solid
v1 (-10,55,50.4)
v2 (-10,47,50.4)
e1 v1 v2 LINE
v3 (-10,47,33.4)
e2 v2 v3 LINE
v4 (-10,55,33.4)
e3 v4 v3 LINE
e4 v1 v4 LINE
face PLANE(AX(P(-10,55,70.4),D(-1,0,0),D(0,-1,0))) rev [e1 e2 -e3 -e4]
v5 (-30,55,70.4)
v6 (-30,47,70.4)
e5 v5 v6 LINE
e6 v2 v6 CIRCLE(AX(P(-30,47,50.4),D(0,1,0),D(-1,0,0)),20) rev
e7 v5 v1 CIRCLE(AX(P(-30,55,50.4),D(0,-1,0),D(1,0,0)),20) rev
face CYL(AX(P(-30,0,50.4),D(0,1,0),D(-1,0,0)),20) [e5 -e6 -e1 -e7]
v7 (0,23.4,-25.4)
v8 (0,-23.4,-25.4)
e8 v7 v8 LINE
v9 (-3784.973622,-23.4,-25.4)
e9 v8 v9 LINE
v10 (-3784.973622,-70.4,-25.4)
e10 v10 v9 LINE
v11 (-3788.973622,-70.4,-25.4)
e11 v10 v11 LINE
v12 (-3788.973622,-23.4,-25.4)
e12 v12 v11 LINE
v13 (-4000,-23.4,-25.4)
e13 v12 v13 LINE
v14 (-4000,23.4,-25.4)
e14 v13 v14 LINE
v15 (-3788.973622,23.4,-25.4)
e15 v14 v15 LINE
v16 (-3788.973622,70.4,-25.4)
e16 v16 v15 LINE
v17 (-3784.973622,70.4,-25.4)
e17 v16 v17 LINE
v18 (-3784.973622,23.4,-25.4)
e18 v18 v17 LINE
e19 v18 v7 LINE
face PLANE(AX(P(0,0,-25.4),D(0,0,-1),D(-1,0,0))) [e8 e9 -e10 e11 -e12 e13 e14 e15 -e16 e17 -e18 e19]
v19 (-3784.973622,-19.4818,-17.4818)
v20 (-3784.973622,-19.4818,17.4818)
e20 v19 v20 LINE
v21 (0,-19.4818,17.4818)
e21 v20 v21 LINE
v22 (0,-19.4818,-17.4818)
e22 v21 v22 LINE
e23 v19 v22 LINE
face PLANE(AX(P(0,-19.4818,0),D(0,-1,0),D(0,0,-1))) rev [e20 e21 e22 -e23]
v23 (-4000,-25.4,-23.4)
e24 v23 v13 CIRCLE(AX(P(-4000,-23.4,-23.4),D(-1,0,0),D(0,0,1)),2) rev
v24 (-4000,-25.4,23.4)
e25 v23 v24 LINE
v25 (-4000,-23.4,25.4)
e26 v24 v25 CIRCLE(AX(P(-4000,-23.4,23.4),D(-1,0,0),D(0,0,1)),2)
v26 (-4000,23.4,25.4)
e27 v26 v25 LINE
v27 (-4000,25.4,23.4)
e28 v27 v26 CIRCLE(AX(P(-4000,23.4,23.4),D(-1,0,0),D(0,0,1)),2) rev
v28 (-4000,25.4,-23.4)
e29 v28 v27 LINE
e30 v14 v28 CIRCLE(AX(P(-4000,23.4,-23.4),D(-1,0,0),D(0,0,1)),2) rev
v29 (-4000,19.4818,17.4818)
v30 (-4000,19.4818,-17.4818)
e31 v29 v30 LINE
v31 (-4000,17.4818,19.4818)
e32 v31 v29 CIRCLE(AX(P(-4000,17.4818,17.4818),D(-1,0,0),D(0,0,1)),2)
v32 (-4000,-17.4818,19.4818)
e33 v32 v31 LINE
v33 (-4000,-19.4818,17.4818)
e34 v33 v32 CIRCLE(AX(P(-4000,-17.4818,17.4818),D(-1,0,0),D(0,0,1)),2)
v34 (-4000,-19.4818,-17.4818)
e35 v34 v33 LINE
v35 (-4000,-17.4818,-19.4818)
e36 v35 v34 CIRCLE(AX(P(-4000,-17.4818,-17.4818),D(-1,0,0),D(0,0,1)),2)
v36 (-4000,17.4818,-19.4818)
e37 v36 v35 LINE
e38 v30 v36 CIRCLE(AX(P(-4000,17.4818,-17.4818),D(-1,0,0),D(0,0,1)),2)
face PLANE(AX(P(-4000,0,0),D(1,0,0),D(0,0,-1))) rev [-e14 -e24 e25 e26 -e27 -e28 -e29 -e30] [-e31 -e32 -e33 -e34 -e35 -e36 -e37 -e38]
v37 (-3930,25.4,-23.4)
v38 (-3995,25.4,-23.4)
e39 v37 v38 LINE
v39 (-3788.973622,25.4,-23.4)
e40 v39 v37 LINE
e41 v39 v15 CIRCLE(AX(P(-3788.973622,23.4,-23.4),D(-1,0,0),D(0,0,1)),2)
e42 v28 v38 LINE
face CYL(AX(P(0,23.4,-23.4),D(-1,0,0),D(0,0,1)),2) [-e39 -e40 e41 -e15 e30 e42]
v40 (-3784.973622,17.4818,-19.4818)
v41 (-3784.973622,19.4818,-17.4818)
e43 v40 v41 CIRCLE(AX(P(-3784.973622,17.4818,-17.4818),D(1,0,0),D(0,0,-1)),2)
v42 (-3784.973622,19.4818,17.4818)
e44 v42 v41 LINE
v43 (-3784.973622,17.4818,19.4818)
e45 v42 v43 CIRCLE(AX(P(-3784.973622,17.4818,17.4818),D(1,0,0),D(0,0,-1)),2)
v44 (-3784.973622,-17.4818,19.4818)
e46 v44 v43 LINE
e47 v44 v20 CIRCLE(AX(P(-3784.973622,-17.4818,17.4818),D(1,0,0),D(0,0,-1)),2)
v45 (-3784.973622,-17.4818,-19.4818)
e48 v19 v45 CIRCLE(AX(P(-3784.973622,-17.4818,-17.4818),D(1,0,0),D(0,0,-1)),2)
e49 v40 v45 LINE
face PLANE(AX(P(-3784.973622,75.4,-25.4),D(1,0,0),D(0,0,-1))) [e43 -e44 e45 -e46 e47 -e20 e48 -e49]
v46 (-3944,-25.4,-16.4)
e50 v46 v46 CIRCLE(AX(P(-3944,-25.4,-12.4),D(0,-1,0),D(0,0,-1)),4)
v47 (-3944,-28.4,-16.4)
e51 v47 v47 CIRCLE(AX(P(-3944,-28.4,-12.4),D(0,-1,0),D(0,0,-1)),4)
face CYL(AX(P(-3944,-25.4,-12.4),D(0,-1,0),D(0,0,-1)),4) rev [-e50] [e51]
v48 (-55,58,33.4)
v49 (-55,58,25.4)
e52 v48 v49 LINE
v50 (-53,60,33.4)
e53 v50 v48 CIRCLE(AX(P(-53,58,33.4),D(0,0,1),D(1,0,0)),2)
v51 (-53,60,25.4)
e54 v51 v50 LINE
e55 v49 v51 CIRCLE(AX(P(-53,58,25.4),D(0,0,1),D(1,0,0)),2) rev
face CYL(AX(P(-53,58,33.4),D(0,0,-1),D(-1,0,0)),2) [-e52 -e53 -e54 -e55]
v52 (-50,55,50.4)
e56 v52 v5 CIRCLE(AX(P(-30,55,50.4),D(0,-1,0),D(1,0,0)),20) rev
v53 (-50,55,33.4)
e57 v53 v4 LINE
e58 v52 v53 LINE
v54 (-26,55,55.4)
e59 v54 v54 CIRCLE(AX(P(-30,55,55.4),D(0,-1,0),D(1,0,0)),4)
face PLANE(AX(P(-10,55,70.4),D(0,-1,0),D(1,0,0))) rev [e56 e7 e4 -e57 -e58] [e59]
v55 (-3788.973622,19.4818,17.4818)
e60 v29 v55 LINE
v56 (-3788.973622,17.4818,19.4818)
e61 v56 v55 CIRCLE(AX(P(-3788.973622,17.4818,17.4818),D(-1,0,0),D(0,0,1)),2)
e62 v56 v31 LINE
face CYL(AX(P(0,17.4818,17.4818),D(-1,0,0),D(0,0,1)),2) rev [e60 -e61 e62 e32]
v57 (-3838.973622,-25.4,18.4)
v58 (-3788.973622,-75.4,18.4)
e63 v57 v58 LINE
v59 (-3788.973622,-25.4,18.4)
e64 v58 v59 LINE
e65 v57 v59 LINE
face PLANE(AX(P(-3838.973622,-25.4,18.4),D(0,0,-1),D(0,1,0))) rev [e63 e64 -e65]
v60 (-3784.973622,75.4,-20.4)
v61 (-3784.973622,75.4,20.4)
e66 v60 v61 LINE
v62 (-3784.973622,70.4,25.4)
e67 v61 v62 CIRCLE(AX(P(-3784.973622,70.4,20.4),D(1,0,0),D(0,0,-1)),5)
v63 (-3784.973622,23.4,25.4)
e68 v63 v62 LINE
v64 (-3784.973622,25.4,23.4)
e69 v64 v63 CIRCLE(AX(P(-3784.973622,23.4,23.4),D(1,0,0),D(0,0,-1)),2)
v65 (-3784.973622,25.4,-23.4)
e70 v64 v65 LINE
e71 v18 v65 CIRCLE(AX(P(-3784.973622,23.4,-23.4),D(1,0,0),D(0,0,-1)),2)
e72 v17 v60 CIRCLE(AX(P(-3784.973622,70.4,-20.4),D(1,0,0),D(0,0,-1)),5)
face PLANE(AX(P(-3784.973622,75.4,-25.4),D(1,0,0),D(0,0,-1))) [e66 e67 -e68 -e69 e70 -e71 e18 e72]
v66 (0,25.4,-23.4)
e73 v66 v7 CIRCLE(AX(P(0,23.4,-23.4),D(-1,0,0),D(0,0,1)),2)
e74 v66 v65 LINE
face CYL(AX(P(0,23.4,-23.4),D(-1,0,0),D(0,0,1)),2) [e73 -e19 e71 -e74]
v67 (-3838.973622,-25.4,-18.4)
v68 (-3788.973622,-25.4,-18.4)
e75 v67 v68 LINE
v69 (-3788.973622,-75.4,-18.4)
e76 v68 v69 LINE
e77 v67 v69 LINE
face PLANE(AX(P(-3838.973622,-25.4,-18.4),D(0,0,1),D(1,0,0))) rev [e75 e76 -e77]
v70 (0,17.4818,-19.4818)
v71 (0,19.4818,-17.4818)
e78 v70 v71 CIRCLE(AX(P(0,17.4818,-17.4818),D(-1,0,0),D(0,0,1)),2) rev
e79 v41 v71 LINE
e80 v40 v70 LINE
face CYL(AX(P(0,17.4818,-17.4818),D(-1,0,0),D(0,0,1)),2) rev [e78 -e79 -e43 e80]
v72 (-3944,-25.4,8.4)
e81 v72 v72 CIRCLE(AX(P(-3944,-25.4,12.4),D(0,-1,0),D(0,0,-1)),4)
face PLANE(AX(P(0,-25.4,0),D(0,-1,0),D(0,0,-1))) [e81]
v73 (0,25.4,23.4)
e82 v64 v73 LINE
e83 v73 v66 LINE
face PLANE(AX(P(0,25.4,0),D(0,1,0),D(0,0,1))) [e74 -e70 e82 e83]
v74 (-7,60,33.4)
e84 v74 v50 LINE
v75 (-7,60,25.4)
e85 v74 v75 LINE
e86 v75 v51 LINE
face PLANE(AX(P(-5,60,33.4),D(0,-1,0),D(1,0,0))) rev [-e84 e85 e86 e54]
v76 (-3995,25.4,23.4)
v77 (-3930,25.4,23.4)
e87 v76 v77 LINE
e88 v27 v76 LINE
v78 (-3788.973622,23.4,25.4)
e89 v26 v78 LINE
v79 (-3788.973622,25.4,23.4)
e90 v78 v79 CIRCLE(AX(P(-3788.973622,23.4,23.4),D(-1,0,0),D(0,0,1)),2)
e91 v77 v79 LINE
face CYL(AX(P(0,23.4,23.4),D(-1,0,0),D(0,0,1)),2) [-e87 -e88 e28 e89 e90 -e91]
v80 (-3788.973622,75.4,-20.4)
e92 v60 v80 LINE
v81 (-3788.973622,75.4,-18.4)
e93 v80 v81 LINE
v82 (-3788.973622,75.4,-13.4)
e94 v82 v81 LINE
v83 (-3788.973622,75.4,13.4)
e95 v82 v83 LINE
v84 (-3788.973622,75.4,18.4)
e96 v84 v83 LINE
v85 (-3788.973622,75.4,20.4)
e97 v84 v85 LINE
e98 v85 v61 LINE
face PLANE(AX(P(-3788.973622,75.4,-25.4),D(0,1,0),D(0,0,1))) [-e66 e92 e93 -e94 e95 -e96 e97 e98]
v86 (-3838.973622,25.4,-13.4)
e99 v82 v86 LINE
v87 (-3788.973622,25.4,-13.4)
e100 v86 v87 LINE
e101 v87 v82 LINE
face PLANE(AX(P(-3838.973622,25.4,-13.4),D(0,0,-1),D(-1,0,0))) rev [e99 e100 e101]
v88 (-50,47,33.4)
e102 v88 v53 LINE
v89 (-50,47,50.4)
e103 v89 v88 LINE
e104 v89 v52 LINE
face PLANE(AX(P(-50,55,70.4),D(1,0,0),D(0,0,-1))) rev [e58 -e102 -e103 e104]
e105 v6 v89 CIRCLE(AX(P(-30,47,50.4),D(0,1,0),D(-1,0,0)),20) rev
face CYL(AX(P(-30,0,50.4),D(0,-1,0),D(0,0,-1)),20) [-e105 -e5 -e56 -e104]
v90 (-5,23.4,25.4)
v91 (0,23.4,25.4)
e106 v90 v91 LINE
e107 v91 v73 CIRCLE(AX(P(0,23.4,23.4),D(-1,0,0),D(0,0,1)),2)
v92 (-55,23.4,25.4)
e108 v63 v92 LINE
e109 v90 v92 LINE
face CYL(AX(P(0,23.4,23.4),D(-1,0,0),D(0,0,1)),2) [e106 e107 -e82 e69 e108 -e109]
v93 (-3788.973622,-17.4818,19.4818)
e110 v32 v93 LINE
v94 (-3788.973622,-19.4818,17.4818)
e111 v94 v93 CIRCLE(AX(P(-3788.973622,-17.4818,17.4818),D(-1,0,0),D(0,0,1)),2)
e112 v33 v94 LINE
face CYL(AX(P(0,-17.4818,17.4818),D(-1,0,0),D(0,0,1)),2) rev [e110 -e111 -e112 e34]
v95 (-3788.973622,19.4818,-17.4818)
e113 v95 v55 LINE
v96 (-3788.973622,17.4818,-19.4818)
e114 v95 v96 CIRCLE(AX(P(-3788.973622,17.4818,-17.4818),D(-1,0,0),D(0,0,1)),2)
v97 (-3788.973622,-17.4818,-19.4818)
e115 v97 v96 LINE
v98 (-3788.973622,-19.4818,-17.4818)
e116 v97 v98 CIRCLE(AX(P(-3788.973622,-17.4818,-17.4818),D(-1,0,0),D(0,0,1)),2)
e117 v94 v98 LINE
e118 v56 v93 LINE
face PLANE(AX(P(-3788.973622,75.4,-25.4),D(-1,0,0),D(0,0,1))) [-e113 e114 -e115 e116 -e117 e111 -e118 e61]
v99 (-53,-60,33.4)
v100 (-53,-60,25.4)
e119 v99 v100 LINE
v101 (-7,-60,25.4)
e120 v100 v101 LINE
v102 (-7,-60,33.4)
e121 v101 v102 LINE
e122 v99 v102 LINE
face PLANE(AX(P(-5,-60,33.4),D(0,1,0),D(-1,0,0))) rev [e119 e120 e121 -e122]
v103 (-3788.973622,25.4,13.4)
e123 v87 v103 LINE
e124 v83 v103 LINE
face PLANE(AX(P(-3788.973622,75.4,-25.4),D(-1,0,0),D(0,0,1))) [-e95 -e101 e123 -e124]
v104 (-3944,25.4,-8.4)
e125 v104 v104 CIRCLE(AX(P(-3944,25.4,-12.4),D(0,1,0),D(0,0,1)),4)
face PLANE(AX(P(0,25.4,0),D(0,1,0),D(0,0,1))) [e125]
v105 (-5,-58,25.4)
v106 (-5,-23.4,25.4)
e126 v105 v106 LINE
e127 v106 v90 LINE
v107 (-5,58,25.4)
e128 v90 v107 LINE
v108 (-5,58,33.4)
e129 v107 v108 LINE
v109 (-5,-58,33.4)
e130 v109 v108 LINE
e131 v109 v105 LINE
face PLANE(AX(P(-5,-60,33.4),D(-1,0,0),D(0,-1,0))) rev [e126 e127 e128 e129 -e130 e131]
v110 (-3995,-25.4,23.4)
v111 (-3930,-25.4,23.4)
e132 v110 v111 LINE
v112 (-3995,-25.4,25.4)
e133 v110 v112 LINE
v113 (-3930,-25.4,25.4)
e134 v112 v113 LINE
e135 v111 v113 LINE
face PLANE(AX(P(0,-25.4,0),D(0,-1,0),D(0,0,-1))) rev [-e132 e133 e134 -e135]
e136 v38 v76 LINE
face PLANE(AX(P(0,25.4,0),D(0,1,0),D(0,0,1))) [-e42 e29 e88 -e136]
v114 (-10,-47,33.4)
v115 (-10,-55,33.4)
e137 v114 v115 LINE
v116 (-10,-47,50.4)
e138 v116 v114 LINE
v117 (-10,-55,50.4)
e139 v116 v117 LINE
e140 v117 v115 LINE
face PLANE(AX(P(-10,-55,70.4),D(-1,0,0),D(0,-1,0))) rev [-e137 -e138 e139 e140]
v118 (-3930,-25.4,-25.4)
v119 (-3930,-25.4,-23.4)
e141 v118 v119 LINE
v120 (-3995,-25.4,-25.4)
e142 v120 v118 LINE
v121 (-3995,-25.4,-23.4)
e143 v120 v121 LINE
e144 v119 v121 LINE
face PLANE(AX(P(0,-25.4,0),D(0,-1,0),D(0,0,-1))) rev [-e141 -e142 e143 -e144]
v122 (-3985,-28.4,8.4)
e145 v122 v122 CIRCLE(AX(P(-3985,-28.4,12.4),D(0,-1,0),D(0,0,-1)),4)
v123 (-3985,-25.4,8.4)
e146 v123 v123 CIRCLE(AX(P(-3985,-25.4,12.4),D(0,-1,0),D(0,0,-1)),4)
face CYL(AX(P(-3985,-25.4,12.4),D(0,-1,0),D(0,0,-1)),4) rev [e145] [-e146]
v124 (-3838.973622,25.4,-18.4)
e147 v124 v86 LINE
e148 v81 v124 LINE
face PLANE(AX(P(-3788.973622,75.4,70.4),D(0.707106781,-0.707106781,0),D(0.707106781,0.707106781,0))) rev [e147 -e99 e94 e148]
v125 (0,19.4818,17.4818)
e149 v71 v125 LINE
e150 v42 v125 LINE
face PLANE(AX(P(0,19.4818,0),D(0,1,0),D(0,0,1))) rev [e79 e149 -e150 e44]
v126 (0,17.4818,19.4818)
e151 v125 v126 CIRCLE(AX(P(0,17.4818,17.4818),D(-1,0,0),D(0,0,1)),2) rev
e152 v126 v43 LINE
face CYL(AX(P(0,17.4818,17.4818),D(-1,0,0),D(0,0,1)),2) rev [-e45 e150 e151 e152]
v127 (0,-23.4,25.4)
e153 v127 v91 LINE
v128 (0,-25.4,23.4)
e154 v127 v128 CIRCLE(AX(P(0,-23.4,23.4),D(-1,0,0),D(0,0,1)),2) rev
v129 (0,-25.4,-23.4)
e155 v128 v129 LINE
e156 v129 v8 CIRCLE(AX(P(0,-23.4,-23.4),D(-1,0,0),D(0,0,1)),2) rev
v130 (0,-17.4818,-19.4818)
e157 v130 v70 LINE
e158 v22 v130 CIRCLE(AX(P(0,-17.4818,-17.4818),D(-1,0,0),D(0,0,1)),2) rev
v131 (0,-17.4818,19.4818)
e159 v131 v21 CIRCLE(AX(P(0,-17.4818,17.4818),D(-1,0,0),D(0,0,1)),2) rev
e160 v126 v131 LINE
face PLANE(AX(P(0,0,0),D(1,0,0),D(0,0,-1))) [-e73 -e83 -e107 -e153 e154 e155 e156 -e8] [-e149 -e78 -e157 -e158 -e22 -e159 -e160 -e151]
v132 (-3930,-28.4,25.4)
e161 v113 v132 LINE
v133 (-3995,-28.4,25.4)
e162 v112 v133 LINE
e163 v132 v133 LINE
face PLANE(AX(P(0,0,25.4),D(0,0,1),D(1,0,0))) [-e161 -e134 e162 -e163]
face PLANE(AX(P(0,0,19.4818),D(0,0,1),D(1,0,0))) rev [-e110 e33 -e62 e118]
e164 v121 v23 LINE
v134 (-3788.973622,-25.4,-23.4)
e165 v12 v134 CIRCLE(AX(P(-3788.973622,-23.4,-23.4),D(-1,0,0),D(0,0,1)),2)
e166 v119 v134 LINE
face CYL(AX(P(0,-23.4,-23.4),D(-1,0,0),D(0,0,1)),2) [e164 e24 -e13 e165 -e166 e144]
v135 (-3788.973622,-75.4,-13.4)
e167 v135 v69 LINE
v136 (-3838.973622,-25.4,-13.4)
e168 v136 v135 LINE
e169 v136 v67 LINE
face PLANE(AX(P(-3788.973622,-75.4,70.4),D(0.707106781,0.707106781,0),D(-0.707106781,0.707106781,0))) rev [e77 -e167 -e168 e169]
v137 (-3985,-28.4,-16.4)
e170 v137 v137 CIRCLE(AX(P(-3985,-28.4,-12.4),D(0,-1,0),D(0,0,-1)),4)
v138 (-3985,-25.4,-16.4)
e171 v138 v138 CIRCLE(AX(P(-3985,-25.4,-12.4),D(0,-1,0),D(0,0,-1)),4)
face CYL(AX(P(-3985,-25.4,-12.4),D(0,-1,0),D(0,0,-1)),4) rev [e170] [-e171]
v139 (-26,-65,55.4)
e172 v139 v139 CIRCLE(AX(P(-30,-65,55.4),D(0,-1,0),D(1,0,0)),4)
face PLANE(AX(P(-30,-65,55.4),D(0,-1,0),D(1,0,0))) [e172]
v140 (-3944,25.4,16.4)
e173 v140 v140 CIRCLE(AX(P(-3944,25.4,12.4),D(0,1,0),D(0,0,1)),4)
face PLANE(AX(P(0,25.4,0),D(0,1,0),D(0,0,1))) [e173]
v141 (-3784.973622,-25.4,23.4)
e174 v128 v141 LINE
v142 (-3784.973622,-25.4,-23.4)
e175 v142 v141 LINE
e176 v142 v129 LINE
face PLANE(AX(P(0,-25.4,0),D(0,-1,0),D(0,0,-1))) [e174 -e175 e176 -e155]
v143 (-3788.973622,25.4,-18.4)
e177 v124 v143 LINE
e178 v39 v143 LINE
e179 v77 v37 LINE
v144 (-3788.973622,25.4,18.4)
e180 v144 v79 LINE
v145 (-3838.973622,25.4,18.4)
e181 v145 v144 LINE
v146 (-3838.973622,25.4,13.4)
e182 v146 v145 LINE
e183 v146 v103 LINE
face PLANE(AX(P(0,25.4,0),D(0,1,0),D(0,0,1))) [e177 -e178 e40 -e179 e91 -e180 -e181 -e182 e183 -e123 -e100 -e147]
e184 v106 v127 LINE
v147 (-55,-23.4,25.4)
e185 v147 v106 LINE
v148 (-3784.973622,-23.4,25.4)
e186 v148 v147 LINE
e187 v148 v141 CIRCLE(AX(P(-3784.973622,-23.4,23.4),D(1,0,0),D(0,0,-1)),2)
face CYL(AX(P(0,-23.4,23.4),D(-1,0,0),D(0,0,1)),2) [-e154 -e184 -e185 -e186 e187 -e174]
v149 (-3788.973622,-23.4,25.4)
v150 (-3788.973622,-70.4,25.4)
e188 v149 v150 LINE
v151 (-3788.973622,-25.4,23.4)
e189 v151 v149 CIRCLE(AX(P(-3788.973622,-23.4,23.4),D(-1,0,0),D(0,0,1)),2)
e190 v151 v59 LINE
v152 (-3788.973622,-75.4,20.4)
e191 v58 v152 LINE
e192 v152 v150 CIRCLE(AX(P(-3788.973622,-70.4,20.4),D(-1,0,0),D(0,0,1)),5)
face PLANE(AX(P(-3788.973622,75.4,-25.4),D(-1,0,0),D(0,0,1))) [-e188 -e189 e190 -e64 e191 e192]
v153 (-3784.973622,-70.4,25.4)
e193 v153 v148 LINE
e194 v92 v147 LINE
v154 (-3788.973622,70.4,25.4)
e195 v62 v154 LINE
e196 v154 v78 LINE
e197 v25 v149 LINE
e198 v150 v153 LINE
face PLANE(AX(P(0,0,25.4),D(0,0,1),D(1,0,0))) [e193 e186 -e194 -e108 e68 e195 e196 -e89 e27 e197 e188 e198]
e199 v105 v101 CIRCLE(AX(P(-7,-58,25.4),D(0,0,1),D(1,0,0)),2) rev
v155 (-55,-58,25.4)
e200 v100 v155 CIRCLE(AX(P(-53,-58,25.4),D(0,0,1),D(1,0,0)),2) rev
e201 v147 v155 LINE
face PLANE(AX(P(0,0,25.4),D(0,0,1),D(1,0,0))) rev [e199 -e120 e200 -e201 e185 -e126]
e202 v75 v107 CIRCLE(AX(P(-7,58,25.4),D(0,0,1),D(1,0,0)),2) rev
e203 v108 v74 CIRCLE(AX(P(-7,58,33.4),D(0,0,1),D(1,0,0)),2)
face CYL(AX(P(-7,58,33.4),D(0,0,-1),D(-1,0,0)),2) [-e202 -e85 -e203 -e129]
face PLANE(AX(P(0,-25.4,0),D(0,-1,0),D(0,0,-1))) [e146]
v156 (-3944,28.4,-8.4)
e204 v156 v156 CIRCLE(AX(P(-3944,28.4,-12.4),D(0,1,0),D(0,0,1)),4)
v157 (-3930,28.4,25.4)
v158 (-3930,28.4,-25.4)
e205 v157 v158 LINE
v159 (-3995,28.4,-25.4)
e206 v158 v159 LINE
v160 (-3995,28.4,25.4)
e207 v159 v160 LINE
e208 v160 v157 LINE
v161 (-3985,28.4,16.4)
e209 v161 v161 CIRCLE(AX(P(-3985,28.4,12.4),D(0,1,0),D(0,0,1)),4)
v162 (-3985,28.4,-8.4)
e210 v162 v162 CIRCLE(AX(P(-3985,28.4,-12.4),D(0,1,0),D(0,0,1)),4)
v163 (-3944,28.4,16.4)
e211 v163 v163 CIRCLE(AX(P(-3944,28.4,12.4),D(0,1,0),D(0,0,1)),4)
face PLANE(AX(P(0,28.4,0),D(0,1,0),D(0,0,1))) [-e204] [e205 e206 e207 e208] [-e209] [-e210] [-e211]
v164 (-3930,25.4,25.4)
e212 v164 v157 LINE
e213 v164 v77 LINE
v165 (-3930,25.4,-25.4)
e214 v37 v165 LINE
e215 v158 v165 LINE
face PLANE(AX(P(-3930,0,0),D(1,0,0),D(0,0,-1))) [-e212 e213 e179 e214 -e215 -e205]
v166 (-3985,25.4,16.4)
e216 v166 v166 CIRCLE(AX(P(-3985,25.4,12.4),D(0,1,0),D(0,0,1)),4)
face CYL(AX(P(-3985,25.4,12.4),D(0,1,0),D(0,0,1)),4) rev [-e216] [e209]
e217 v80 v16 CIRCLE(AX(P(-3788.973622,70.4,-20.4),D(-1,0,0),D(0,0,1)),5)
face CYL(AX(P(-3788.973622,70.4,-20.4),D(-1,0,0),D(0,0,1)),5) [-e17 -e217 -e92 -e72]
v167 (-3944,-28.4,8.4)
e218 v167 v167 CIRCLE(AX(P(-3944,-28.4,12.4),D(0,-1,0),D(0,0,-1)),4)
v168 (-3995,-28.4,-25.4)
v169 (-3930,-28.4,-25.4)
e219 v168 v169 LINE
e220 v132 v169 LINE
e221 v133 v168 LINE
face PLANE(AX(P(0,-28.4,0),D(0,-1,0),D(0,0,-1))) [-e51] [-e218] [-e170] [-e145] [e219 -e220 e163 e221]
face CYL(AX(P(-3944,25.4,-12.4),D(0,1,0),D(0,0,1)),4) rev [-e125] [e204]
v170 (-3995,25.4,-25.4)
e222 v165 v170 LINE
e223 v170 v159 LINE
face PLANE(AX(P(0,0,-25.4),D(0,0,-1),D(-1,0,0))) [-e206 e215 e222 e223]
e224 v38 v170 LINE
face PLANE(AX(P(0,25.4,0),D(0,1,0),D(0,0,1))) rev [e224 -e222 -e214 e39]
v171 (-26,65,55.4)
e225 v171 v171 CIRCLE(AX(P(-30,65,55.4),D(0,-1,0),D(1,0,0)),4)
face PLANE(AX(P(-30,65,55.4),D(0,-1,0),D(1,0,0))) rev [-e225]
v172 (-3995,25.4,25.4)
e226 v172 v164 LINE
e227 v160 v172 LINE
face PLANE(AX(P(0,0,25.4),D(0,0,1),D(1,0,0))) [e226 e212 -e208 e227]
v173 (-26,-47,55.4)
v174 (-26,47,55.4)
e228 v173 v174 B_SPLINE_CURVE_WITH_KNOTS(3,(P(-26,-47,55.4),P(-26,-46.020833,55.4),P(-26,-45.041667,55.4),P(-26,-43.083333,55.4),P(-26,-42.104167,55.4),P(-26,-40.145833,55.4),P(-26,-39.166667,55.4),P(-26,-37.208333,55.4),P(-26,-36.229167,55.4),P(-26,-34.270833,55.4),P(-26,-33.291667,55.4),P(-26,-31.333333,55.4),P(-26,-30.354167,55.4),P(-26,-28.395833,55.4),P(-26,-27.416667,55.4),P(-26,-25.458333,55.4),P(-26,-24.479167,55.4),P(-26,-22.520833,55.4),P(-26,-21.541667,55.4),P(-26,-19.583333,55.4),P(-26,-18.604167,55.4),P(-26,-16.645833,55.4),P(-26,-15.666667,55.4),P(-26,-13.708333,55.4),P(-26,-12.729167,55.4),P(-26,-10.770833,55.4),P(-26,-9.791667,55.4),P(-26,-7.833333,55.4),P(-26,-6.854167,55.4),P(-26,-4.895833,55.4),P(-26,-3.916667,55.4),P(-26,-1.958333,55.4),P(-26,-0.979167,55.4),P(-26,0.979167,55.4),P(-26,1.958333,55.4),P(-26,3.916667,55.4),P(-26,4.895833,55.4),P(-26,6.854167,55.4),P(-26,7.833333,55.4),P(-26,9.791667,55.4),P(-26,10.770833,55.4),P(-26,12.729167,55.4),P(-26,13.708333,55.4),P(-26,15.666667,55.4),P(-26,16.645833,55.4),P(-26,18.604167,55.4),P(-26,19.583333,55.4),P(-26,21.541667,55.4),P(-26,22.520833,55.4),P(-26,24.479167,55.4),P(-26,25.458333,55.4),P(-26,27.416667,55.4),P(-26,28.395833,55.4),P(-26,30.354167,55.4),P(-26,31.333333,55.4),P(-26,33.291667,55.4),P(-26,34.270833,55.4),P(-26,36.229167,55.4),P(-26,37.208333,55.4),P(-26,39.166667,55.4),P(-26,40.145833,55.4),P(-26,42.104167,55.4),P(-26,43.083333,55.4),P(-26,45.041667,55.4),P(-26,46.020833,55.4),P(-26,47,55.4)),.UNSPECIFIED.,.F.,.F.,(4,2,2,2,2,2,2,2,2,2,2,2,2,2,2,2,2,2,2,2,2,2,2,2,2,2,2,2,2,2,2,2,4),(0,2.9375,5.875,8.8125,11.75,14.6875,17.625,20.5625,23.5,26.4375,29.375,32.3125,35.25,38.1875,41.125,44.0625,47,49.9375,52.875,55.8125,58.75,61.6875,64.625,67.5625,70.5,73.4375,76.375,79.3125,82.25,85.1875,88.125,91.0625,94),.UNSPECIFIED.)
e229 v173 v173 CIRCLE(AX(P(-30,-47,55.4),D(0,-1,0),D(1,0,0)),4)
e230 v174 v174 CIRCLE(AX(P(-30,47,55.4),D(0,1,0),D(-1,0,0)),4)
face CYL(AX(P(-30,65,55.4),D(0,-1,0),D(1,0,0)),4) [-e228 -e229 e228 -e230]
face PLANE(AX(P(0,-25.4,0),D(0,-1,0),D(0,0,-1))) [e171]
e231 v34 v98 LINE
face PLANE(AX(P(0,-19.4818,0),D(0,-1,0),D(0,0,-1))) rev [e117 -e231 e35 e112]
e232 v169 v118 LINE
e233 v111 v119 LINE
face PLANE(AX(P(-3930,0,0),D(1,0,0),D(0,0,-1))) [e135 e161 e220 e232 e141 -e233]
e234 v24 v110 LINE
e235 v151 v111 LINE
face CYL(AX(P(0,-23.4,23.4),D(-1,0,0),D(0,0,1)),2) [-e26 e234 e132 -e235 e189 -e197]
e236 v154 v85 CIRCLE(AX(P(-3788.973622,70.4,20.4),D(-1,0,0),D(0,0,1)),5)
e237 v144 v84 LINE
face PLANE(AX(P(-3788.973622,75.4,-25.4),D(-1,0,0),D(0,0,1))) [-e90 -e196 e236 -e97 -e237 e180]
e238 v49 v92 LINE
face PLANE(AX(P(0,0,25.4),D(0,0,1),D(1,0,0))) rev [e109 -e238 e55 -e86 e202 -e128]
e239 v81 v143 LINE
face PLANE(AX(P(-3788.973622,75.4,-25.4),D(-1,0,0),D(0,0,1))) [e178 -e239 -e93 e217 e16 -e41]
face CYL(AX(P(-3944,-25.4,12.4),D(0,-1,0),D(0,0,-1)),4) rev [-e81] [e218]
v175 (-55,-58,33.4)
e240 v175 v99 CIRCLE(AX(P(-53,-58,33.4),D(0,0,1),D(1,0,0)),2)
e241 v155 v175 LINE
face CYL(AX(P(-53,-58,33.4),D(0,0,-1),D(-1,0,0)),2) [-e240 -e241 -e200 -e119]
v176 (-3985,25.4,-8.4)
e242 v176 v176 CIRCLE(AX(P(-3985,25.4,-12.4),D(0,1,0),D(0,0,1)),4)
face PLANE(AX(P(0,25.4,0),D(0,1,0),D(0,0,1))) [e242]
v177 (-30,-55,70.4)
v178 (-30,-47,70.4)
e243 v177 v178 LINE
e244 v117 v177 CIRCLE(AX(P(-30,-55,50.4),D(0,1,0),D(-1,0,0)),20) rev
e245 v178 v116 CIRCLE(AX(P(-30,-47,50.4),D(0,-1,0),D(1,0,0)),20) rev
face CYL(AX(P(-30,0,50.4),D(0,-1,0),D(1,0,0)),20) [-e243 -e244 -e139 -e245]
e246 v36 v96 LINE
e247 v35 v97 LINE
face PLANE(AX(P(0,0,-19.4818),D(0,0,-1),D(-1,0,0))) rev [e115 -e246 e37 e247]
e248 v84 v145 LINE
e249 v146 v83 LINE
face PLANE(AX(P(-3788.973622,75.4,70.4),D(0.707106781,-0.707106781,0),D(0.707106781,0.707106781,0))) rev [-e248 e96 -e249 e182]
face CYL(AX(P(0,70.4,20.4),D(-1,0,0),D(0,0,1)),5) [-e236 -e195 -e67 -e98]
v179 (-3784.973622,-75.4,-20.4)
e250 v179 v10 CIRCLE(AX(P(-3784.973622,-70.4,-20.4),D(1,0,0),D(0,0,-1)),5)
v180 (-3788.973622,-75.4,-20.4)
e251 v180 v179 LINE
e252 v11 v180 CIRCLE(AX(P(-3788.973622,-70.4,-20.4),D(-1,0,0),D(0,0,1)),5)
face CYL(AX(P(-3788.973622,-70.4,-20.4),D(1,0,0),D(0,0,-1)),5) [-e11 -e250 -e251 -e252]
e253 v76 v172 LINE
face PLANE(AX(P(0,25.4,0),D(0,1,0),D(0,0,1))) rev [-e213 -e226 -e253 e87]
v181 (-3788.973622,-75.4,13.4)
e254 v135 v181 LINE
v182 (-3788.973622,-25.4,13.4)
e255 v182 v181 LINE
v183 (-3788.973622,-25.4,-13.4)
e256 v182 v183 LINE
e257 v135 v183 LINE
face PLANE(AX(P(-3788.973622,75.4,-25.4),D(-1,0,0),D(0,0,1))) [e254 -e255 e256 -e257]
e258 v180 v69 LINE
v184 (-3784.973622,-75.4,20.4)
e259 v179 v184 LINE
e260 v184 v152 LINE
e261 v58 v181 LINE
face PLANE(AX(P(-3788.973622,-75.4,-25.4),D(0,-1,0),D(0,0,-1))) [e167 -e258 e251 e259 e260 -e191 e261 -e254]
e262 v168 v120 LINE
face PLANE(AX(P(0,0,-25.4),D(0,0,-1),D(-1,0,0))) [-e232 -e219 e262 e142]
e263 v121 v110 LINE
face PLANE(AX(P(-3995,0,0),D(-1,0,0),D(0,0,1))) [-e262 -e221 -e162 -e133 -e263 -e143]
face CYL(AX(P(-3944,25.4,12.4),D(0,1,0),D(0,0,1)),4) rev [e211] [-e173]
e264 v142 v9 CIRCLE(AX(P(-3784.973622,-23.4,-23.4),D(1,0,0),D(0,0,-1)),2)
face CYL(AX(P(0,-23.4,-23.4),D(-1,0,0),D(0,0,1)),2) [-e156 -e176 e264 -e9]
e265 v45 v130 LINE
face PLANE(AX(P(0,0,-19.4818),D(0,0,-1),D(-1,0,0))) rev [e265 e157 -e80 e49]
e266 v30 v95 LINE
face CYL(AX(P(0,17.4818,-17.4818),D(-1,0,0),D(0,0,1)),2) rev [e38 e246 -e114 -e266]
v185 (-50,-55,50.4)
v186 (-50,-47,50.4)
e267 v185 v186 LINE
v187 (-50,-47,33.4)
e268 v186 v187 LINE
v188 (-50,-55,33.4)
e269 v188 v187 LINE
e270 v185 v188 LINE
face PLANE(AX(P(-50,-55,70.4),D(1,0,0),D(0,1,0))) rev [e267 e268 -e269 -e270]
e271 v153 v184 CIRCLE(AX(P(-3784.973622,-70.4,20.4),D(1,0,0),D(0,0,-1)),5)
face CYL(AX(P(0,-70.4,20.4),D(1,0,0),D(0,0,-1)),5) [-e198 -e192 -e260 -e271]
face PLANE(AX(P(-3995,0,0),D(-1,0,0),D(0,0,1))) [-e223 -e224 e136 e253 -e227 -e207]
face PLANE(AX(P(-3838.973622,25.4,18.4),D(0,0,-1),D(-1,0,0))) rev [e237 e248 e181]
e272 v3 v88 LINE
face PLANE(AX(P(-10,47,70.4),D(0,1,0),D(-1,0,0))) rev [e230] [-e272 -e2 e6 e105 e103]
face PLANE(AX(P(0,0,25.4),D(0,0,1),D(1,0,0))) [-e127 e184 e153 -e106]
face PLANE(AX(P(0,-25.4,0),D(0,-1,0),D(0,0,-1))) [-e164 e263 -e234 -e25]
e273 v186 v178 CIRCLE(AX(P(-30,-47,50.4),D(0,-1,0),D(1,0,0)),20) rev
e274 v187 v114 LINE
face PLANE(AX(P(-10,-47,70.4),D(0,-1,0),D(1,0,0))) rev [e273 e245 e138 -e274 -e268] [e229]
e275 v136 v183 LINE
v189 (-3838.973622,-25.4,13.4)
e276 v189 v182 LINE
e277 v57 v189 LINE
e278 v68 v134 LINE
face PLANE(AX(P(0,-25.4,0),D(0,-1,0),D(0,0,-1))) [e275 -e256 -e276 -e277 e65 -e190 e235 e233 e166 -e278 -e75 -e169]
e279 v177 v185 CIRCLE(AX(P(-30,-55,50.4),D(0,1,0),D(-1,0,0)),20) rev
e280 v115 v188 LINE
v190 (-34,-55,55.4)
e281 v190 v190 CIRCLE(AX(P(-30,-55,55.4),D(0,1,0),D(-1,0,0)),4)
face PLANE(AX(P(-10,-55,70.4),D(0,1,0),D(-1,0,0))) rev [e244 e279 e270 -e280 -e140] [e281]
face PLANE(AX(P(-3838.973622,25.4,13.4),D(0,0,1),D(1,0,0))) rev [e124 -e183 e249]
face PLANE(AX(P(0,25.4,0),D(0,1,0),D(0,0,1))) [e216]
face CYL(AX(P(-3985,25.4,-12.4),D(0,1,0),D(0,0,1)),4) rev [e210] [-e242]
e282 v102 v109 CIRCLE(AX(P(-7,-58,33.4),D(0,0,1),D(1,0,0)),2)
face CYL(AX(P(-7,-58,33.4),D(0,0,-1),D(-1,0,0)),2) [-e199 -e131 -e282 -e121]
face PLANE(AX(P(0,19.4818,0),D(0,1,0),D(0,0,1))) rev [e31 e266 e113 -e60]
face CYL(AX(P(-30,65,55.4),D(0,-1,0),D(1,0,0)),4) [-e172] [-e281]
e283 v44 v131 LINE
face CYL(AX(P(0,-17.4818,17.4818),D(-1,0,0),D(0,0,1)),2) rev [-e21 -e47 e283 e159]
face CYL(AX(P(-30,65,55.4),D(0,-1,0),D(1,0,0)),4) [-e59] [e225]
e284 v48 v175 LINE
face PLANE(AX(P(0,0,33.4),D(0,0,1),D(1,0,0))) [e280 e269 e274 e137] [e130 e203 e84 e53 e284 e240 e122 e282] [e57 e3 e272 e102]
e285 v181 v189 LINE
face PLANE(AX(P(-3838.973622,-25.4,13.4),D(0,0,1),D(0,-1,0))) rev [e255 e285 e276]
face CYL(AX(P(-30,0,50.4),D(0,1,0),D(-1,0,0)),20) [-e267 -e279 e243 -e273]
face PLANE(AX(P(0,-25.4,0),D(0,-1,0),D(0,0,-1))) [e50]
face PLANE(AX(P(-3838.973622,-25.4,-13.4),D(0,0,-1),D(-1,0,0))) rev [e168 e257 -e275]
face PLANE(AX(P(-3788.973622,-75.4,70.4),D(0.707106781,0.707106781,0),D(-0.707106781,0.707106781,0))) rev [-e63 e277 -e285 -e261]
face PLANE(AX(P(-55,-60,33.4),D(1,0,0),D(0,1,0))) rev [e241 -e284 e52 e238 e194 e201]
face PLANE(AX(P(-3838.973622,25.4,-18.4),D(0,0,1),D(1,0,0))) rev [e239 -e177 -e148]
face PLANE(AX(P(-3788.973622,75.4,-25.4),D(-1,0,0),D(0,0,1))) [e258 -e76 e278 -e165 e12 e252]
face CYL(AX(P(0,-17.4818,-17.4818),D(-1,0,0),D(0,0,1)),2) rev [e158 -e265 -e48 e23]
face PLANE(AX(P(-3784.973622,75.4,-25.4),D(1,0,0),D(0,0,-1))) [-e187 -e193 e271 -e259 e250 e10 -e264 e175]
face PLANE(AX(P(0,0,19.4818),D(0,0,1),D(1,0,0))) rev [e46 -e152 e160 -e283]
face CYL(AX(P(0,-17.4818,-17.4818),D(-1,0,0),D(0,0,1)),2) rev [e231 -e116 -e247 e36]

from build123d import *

# Parameters (mm, degrees)
BOSS_EXTRUDE2_START         = -23.4
BOSS_EXTRUDE2_OUTLINE_W     = 4000
BOSS_EXTRUDE2_OUTLINE_H     = 5.9182
BOSS_EXTRUDE2_DEPTH         = 46.8
BOSS_EXTRUDE2_START_2       = -25.4
BOSS_EXTRUDE2_2_OUTLINE_W   = 50
BOSS_EXTRUDE2_2_OUTLINE_H   = 8
BOSS_EXTRUDE2_2_OUTLINE_W_2 = 4000
BOSS_EXTRUDE2_2_OUTLINE_H_2 = 38.9636
BOSS_EXTRUDE2_2_DEPTH       = 5.9182
BOSS_EXTRUDE2_START_3       = 19.4818
BOSS_EXTRUDE2_3_OUTLINE_W   = 50
BOSS_EXTRUDE2_3_OUTLINE_H   = 8
BOSS_EXTRUDE2_3_OUTLINE_W_2 = 4000
BOSS_EXTRUDE2_3_OUTLINE_H_2 = 38.9636
BOSS_EXTRUDE2_3_DEPTH       = 5.9182
BOSS_EXTRUDE2_START_4       = -60
BOSS_EXTRUDE2_4_OUTLINE_W   = 50
BOSS_EXTRUDE2_4_OUTLINE_H   = 8
BOSS_EXTRUDE2_4_DEPTH       = 120
BOSS_EXTRUDE2_START_5       = -28.4
BOSS_EXTRUDE2_5_OUTLINE_W   = 65
BOSS_EXTRUDE2_5_OUTLINE_H   = 50.8
BOSS_EXTRUDE2_5_OUTLINE_R   = 4
BOSS_EXTRUDE2_5_DEPTH       = 3
BOSS_EXTRUDE2_START_6       = 25.4
BOSS_EXTRUDE2_6_OUTLINE_W   = 65
BOSS_EXTRUDE2_6_OUTLINE_H   = 50.8
BOSS_EXTRUDE2_6_OUTLINE_R   = 4
BOSS_EXTRUDE2_6_DEPTH       = 3
BOSS_EXTRUDE2_START_7       = -4000
BOSS_EXTRUDE2_7_DEPTH       = 4000
SKETCH1_W                   = 40
SKETCH1_H                   = 8
BOSS_EXTRUDE1_DEPTH         = 45
FILLET1_R                   = 20
FILLET2_R                   = 2
BOSS_EXTRUDE3_DEPTH         = 10
BOSS_EXTRUDE3_DEPTH_BACK    = 120
SKETCH3_R                   = 4
SKETCH4_W                   = 4
SKETCH4_H                   = 150.8
BOSS_EXTRUDE4_DEPTH         = 50.8
SKETCH5_W                   = 5
SKETCH5_H                   = 50
BOSS_EXTRUDE5_DEPTH         = 50
CUT_EXTRUDE4_DEPTH          = 4002.695965463
FILLET3_R                   = 5
FILLET4_R                   = 5
FILLET5_R                   = 5
FILLET6_R                   = 5


with BuildPart() as part:
    # Boss-Extrude2: read off the stored shape, not the designer's step
    # Boss-Extrude2 outline → Boss-Extrude2 (new body)
    with BuildSketch(Plane(origin=(0, 0, 0), x_dir=(1, 0, 0), z_dir=(0, 1, 0)).offset(BOSS_EXTRUDE2_START)):
        Polygon((-55, -25.4), (-55, -33.4), (-5, -33.4), (-5, -25.4), (0, -25.4), (0, -19.4818), (-4000, -19.4818), (-4000, -25.4), align=None)
        with Locations((-2000, 22.4409)):
            Rectangle(BOSS_EXTRUDE2_OUTLINE_W, BOSS_EXTRUDE2_OUTLINE_H)
    extrude(amount=BOSS_EXTRUDE2_DEPTH)

    # Boss-Extrude2 2 outline → Boss-Extrude2 2 (add)
    with BuildSketch(Plane(origin=(0, 0, 0), x_dir=(1, 0, 0), z_dir=(0, 1, 0)).offset(BOSS_EXTRUDE2_START_2)):
        with Locations((-30, -29.4)):
            Rectangle(BOSS_EXTRUDE2_2_OUTLINE_W, BOSS_EXTRUDE2_2_OUTLINE_H)
        with Locations((-2000, 0)):
            Rectangle(BOSS_EXTRUDE2_2_OUTLINE_W_2, BOSS_EXTRUDE2_2_OUTLINE_H_2)
    extrude(amount=BOSS_EXTRUDE2_2_DEPTH)

    # Boss-Extrude2 3 outline → Boss-Extrude2 3 (add)
    with BuildSketch(Plane(origin=(0, 0, 0), x_dir=(1, 0, 0), z_dir=(0, 1, 0)).offset(BOSS_EXTRUDE2_START_3)):
        with Locations((-30, -29.4)):
            Rectangle(BOSS_EXTRUDE2_3_OUTLINE_W, BOSS_EXTRUDE2_3_OUTLINE_H)
        with Locations((-2000, 0)):
            Rectangle(BOSS_EXTRUDE2_3_OUTLINE_W_2, BOSS_EXTRUDE2_3_OUTLINE_H_2)
    extrude(amount=BOSS_EXTRUDE2_3_DEPTH)

    # Boss-Extrude2 4 outline → Boss-Extrude2 4 (add)
    with BuildSketch(Plane(origin=(0, 0, 0), x_dir=(1, 0, 0), z_dir=(0, 1, 0)).offset(BOSS_EXTRUDE2_START_4)):
        with Locations((-30, -29.4)):
            Rectangle(BOSS_EXTRUDE2_4_OUTLINE_W, BOSS_EXTRUDE2_4_OUTLINE_H)
    extrude(amount=BOSS_EXTRUDE2_4_DEPTH)

    # Boss-Extrude2 5 outline → Boss-Extrude2 5 (add)
    with BuildSketch(Plane(origin=(0, 0, 0), x_dir=(1, 0, 0), z_dir=(0, 1, 0)).offset(BOSS_EXTRUDE2_START_5)):
        with Locations((-3962.5, 0)):
            Rectangle(BOSS_EXTRUDE2_5_OUTLINE_W, BOSS_EXTRUDE2_5_OUTLINE_H)
        with Locations((-3944, 12.4)):
            Circle(BOSS_EXTRUDE2_5_OUTLINE_R, mode=Mode.SUBTRACT)
        with Locations((-3985, -12.4)):
            Circle(BOSS_EXTRUDE2_5_OUTLINE_R, mode=Mode.SUBTRACT)
        with Locations((-3944, -12.4)):
            Circle(BOSS_EXTRUDE2_5_OUTLINE_R, mode=Mode.SUBTRACT)
        with Locations((-3985, 12.4)):
            Circle(BOSS_EXTRUDE2_5_OUTLINE_R, mode=Mode.SUBTRACT)
    extrude(amount=BOSS_EXTRUDE2_5_DEPTH)

    # Boss-Extrude2 6 outline → Boss-Extrude2 6 (add)
    with BuildSketch(Plane(origin=(0, 0, 0), x_dir=(1, 0, 0), z_dir=(0, 1, 0)).offset(BOSS_EXTRUDE2_START_6)):
        with Locations((-3962.5, 0)):
            Rectangle(BOSS_EXTRUDE2_6_OUTLINE_W, BOSS_EXTRUDE2_6_OUTLINE_H)
        with Locations((-3944, 12.4)):
            Circle(BOSS_EXTRUDE2_6_OUTLINE_R, mode=Mode.SUBTRACT)
        with Locations((-3985, -12.4)):
            Circle(BOSS_EXTRUDE2_6_OUTLINE_R, mode=Mode.SUBTRACT)
        with Locations((-3944, -12.4)):
            Circle(BOSS_EXTRUDE2_6_OUTLINE_R, mode=Mode.SUBTRACT)
        with Locations((-3985, 12.4)):
            Circle(BOSS_EXTRUDE2_6_OUTLINE_R, mode=Mode.SUBTRACT)
    extrude(amount=BOSS_EXTRUDE2_6_DEPTH)

    # Boss-Extrude2 7 outline → Boss-Extrude2 7 (add)
    with BuildSketch(Plane.YZ.offset(BOSS_EXTRUDE2_START_7)):
        with BuildLine():
            Line((23.4, 19.4818), (25.4, 19.4818))
            Line((25.4, 19.4818), (25.4, 23.4))
            ThreePointArc((25.4, 23.4), (24.814213562, 24.814213562), (23.4, 25.4))
            Line((23.4, 25.4), (23.4, 19.4818))
        make_face()
        with BuildLine():
            ThreePointArc((23.4, -25.4), (24.814213562, -24.814213562), (25.4, -23.4))
            Line((25.4, -23.4), (25.4, -19.4818))
            Line((25.4, -19.4818), (23.4, -19.4818))
            Line((23.4, -19.4818), (23.4, -25.4))
        make_face()
        with BuildLine():
            Line((19.4818, 19.4818), (17.4818, 19.4818))
            ThreePointArc((17.4818, 19.4818), (18.896013562, 18.896013562), (19.4818, 17.4818))
            Line((19.4818, 17.4818), (19.4818, 19.4818))
        make_face()
        with BuildLine():
            ThreePointArc((-19.4818, 17.4818), (-18.896013562, 18.896013562), (-17.4818, 19.4818))
            Line((-17.4818, 19.4818), (-19.4818, 19.4818))
            Line((-19.4818, 19.4818), (-19.4818, 17.4818))
        make_face()
        with BuildLine():
            Line((19.4818, -19.4818), (19.4818, -17.4818))
            ThreePointArc((19.4818, -17.4818), (18.896013562, -18.896013562), (17.4818, -19.4818))
            Line((17.4818, -19.4818), (19.4818, -19.4818))
        make_face()
        with BuildLine():
            ThreePointArc((-17.4818, -19.4818), (-18.896013562, -18.896013562), (-19.4818, -17.4818))
            Line((-19.4818, -17.4818), (-19.4818, -19.4818))
            Line((-19.4818, -19.4818), (-17.4818, -19.4818))
        make_face()
        with BuildLine():
            Line((-25.4, 23.4), (-25.4, 19.4818))
            Line((-25.4, 19.4818), (-23.4, 19.4818))
            Line((-23.4, 19.4818), (-23.4, 25.4))
            ThreePointArc((-23.4, 25.4), (-24.814213562, 24.814213562), (-25.4, 23.4))
        make_face()
        with BuildLine():
            ThreePointArc((-25.4, -23.4), (-24.814213562, -24.814213562), (-23.4, -25.4))
            Line((-23.4, -25.4), (-23.4, -19.4818))
            Line((-23.4, -19.4818), (-25.4, -19.4818))
            Line((-25.4, -19.4818), (-25.4, -23.4))
        make_face()
    extrude(amount=BOSS_EXTRUDE2_7_DEPTH)

    # Sketch1 → Boss-Extrude1 (add)
    with BuildSketch(Plane.XY.offset(25.4)):
        with Locations((-30, 51)):
            Rectangle(SKETCH1_W, SKETCH1_H)
        with Locations((-30, -51)):
            Rectangle(SKETCH1_W, SKETCH1_H)
    extrude(amount=BOSS_EXTRUDE1_DEPTH)

    # Fillet1
    fillet1_edges = [part.edges().sort_by_distance(p)[0] for p in [
        (-10, 51, 70.4),
        (-50, 51, 70.4),
        (-50, -51, 70.4),
        (-10, -51, 70.4),
    ]]
    fillet(fillet1_edges, radius=FILLET1_R - 0.0001)  # a hair under: the kernel refuses the full size

    # Fillet2
    fillet2_edges = [part.edges().sort_by_distance(p)[0] for p in [
        (-5, -60, 29.4),
        (-5, 60, 29.4),
        (-55, 60, 29.4),
        (-55, -60, 29.4),
    ]]
    fillet(fillet2_edges, radius=FILLET2_R)

    # Sketch3 → Boss-Extrude3 (add, two sides: drawn at the far end of the back side and taken through both)
    with BuildSketch(Plane.XZ.offset(55).offset(-BOSS_EXTRUDE3_DEPTH_BACK)):
        with Locations((-30, 55.4)):
            Circle(SKETCH3_R)
    extrude(amount=BOSS_EXTRUDE3_DEPTH + BOSS_EXTRUDE3_DEPTH_BACK)

    # Sketch4 → Boss-Extrude4 (add)
    with BuildSketch(Plane.XY.offset(25.4)):
        with Locations((-3786.973621807, 0)):
            Rectangle(SKETCH4_W, SKETCH4_H)
    extrude(amount=-BOSS_EXTRUDE4_DEPTH)

    # Sketch5 → Boss-Extrude5 (add)
    with BuildSketch(Plane.ZY.offset(3788.973621807)):
        with Locations((15.9, 50.4)):
            Rectangle(SKETCH5_W, SKETCH5_H)
        with Locations((15.9, -50.4)):
            Rectangle(SKETCH5_W, SKETCH5_H)
        with Locations((-15.9, -50.4)):
            Rectangle(SKETCH5_W, SKETCH5_H)
        with Locations((-15.9, 50.4)):
            Rectangle(SKETCH5_W, SKETCH5_H)
    extrude(amount=BOSS_EXTRUDE5_DEPTH)

    # Sketch6 → Cut-Extrude4 (cut, through all)
    with BuildSketch(Plane(origin=(0, 0, -18.4), x_dir=(-1, 0, 0), z_dir=(0, 0, -1))):
        Polygon((3788.973621807, 75.4), (3838.973621807, 25.4), (3838.973621807, 75.4), align=None)
        Polygon((3788.973621807, -75.4), (3838.973621807, -25.4), (3838.973621807, -75.4), align=None)
    extrude(amount=-CUT_EXTRUDE4_DEPTH, mode=Mode.SUBTRACT)

    # Fillet3
    fillet3_edges = [part.edges().sort_by_distance(p)[0] for p in [
        (-3786.973621807, 75.4, -25.4),
    ]]
    fillet(fillet3_edges, radius=FILLET3_R)

    # Fillet4
    fillet4_edges = [part.edges().sort_by_distance(p)[0] for p in [
        (-3786.973621807, 75.4, 25.4),
    ]]
    fillet(fillet4_edges, radius=FILLET4_R)

    # Fillet5
    fillet5_edges = [part.edges().sort_by_distance(p)[0] for p in [
        (-3786.973621807, -75.4, 25.4),
    ]]
    fillet(fillet5_edges, radius=FILLET5_R)

    # Fillet6
    fillet6_edges = [part.edges().sort_by_distance(p)[0] for p in [
        (-3786.973621807, -75.4, -25.4),
    ]]
    fillet(fillet6_edges, radius=FILLET6_R)


solid = part.part
